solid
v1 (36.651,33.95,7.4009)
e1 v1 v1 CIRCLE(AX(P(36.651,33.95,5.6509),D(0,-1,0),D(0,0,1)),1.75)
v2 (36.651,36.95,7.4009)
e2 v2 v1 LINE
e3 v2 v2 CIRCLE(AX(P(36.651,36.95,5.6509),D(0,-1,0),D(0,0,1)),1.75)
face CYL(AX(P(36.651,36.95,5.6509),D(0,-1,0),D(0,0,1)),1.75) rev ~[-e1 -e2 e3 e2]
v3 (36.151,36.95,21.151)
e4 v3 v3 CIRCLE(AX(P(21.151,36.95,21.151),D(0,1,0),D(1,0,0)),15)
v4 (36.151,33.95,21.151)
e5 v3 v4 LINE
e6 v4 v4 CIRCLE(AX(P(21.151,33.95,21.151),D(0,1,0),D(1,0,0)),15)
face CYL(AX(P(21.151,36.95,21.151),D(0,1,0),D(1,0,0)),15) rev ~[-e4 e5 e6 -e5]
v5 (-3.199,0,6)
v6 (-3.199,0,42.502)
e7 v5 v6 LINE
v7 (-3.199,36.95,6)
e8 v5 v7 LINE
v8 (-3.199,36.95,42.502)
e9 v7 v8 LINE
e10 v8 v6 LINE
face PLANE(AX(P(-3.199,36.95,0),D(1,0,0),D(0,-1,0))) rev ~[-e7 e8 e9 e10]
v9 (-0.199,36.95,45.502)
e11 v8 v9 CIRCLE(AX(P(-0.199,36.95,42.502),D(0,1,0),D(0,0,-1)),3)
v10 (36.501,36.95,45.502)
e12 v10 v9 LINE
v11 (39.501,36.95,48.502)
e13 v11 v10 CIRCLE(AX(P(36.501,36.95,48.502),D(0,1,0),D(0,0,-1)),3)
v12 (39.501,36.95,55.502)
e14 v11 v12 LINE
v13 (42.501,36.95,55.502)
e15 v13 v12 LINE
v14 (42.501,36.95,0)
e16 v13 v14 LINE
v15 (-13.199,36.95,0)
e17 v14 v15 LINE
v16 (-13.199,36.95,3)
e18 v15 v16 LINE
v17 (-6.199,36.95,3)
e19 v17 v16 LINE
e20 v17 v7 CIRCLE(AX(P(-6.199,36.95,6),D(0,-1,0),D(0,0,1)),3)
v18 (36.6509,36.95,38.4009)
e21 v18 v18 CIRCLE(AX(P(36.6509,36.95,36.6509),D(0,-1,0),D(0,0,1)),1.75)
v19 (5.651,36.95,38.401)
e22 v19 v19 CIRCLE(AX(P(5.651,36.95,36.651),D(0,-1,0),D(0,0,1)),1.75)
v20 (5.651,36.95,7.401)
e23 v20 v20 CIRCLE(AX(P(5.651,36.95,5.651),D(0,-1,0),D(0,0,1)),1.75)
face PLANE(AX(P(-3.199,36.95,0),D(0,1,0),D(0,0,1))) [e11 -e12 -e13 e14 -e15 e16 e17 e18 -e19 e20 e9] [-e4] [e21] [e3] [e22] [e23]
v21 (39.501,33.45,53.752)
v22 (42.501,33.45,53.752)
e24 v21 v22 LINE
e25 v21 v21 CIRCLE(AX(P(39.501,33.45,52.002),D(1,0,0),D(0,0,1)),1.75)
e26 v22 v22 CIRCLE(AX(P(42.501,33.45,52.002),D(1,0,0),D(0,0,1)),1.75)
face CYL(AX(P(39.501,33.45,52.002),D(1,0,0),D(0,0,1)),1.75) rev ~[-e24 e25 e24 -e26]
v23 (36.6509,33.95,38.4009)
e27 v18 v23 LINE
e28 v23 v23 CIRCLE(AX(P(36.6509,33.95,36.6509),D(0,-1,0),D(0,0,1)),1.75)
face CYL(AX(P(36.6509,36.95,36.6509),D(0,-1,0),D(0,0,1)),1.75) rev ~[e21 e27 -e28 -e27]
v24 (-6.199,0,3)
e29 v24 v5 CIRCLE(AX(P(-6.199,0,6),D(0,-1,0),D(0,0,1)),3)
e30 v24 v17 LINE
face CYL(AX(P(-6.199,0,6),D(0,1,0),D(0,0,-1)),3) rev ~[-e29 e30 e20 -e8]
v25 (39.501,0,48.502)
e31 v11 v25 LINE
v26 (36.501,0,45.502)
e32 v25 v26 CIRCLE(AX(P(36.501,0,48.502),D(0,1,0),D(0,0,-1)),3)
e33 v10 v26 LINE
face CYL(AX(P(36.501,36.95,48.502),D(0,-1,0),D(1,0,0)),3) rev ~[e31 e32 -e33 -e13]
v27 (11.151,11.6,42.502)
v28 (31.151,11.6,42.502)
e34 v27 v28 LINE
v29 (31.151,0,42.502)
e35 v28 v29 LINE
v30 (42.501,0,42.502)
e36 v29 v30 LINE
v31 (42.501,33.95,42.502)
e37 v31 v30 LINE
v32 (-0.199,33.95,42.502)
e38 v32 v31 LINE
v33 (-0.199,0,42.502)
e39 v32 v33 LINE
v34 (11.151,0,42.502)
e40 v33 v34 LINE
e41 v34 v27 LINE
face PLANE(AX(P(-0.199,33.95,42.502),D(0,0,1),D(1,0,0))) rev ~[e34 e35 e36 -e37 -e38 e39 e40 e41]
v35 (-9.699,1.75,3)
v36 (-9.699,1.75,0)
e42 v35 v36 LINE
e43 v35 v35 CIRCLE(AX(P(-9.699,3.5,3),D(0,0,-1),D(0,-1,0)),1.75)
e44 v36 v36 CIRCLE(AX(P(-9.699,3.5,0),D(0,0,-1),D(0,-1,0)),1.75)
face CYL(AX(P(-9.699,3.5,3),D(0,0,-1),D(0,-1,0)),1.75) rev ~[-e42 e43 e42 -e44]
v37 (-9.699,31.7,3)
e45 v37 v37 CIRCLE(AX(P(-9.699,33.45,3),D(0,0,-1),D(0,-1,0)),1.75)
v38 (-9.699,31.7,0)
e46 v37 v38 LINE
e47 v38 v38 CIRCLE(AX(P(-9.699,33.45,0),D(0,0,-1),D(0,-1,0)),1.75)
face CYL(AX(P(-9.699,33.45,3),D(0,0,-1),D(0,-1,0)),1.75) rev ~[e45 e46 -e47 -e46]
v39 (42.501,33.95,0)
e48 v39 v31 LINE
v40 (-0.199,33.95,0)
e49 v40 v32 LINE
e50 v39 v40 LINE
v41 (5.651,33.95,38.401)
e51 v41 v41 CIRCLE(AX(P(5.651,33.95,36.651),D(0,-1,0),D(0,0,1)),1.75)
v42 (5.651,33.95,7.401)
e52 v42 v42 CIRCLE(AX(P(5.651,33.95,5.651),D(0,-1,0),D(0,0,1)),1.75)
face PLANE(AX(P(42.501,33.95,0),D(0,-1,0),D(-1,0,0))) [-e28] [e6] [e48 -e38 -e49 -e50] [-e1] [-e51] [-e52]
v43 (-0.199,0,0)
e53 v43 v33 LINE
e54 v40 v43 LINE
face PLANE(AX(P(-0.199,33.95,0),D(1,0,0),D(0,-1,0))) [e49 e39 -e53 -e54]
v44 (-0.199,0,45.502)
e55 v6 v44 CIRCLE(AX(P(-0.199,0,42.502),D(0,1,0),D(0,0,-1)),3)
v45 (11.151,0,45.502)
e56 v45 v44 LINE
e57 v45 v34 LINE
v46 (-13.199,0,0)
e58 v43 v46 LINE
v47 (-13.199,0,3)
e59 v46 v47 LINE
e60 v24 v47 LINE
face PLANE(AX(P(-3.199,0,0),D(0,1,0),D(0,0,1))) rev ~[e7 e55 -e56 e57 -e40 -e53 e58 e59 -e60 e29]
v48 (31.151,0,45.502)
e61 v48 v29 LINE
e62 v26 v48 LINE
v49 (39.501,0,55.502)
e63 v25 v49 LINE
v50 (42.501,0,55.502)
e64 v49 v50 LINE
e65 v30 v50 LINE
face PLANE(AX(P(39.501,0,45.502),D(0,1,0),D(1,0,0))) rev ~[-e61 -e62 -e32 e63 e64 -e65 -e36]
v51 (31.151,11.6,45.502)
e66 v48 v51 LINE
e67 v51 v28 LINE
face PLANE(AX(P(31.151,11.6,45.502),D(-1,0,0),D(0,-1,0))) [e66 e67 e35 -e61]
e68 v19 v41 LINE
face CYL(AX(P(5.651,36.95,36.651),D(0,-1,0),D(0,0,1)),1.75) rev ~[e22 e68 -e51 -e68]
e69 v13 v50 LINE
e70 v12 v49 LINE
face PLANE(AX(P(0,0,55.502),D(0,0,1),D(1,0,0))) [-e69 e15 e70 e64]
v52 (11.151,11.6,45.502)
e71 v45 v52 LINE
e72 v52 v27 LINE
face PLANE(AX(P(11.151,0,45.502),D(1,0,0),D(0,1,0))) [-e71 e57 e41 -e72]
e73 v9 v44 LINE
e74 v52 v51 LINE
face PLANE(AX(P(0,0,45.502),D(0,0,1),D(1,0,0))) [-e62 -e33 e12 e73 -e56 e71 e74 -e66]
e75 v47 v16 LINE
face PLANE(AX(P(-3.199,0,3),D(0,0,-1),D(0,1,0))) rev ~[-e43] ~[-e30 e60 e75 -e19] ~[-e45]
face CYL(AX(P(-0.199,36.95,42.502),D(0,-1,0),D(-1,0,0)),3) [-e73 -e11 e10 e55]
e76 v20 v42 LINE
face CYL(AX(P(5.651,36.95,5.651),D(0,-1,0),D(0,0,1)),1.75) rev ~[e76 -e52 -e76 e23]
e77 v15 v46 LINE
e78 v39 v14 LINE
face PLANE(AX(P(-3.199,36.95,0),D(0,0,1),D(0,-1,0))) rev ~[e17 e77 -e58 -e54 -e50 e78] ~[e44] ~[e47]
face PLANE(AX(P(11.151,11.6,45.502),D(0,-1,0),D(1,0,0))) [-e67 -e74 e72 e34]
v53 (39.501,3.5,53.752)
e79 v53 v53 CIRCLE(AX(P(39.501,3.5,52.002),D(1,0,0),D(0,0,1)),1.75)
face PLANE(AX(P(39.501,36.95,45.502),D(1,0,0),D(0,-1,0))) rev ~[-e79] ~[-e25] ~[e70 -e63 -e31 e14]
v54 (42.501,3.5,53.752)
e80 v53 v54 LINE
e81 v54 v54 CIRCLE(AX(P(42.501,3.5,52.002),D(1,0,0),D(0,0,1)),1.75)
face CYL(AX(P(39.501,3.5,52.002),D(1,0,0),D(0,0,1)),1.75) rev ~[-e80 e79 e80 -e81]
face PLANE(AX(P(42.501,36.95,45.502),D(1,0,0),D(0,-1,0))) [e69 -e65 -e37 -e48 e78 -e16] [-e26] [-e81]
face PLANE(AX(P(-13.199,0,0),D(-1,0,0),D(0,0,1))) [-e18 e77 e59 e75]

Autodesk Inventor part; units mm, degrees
ref_plane "YZ Plane" through (0, 0, 0) normal (1, 0, 0) x (0, 1, 0)
ref_plane "XZ Plane" through (0, 0, 0) normal (0, 1, 0) x (-1, 0, 0)
ref_plane "XY Plane" through (0, 0, 0) normal (0, 0, 1) x (1, 0, 0)
sketch "Boceto1" plane through (0, 0, 0) normal (0, 0, 1) x (1, 0, 0)
  line L0 (42.301, 0) -> (42.301, 9.6) projected
  line L1 (42.302, 9.6) -> (42.302, 26.1) projected
  line L2 (42.301, 26.1) -> (42.301, 33.75) projected
  line L3 (38.301, 0) -> (42.301, 0) projected
  line L4 (4.001, 33.75) -> (38.301, 33.75) projected
  line L5 (38.301, 33.75) -> (42.301, 33.75) projected
  line L6 (0.001, 33.75) -> (4.001, 33.75) projected
  line L7 (0.001, 26.1) -> (0.001, 33.75) projected
  line L8 (0.001, 9.6) -> (0.001, 26.1) projected
  line L9 (0.001, 0) -> (0.001, 9.6) projected
  line L10 (42.301, 33.75) -> (0.001, 33.75)
  line L11 (0.001, 33.75) -> (0.001, 0)
  line L12 (0.001, 0) -> (42.301, 0)
  line L13 (42.301, 0) -> (42.301, 33.75)
  line L14 (42.501, 33.95) -> (-0.199, 33.95)
  line L15 (-0.199, 33.95) -> (-0.199, -0.2)
  line L16 (-0.199, -0.2) -> (42.501, -0.2)
  line L17 (42.501, -0.2) -> (42.501, 33.95)
  line L18 (42.501, 36.95) -> (-3.199, 36.95)
  line L19 (-3.199, 36.95) -> (-3.199, 0)
  line L20 (-3.199, -3.2) -> (45.501, -3.2)
  line L21 (45.501, 0) -> (45.501, 36.95)
  line L22 (42.301, 0) -> (45.501, 0)
  line L23 (0.001, 0) -> (-3.199, 0)
  line L24 (42.501, 33.95) -> (42.501, 36.95)
  point P0 (0, 0)
  point P1 (-0.199, 0)
  dimension "d0" = 0.2
  dimension "d1" = 3
extrude "Extrusión1" add sketch "Boceto1" along normal blind 45.502 contours L14 L15 L23 L19 L18 L24
sketch "Boceto2" plane through (-0.199, 33.95, 0) normal (0, -1, 0) x (1, 0, 0)
  line L0 (0, 0) -> (42.7, 0) projected
  line L1 (42.7, 0) -> (42.7, 45.502) projected
  line L2 (0, 45.502) -> (42.7, 45.502) projected
  line L3 (0, 0) -> (0, 45.502) projected
  line L4 (42.7, 45.502) -> (0, 45.502)
  line L5 (0, 45.502) -> (0, 42.502)
  line L6 (0, 42.502) -> (42.7, 42.502)
  line L7 (42.7, 42.502) -> (42.7, 45.502)
  point P0 (0.199, 0)
  dimension "d4" = 3
extrude "Extrusión2" add sketch "Boceto2" along normal up to surface (33.95 mm away) contours L3 L2 L1 L6
sketch "Boceto3" plane through (0, 0, 45.502) normal (0, 0, 1) x (1, 0, 0)
  line L0 (-3.199, 0) -> (42.501, 0) projected
  line L1 (42.501, 36.95) -> (42.501, 0) projected
  line L2 (42.501, 36.95) -> (-3.199, 36.95) projected
  line L3 (-3.199, 36.95) -> (-3.199, 0) projected
  line L4 (-6.5037, 43.25) -> (-6.5037, 58.25) projected
  line L5 (-6.5037, 43.25) -> (-6.5037, 58.25) projected
  line L6 (29.151, 9.6) -> (29.151, 3.2) projected
  line L7 (29.151, 0) -> (29.151, 3.2) projected
  line L8 (13.651, 3.6) -> (13.651, 9.1) projected
  line L9 (13.151, 3.2) -> (13.151, 0) projected
  line L10 (13.151, 9.6) -> (13.151, 3.2) projected
  line L11 (29.151, 9.6) -> (13.151, 9.6) projected
  line L12 (11.151, 0) -> (11.151, 3.2)
  line L13 (11.151, 3.2) -> (11.151, 11.6)
  line L14 (11.151, 11.6) -> (31.151, 11.6)
  line L15 (31.151, 11.6) -> (31.151, 3.2)
  line L16 (31.151, 3.2) -> (31.151, 0)
  point P0 (0, 0)
  point P1 (-15.9908, 43.25)
  dimension "d7" = 2
extrude "Extrusión3" cut sketch "Boceto3" against normal blind 10 contours L12 L13 L14 L15 L16 L0 L7 L6 L11 L10 L9 | L9 L10 L11 L6 L7 L0
sketch "Boceto4" plane through (-3.199, 36.95, 0) normal (0, 1, 0) x (1, 0, 0)
  circle A0 centre (24.35, -21.151) radius 2.5 projected
  circle A1 centre (24.35, -21.151) radius 15
  point P0 (3.199, 0)
  dimension "d10" = 30
extrude "Extrusión4" cut sketch "Boceto4" against normal blind 10 contours A0 | A1
sketch "Boceto5" plane through (-3.199, 36.95, 0) normal (0, 1, 0) x (1, 0, 0)
  circle A0 centre (24.35, -21.151) radius 15 projected
  line L0 (45.7, 0) -> (0, 0) projected
  line L1 (0, 0) -> (0, -45.502) projected
  line L2 (45.7, -45.502) -> (0, -45.502) projected
  line L3 (45.7, 0) -> (45.7, -45.502) projected
  circle A1 centre (24.35, -21.151) radius 15 projected
  line L4 (45.7, -42.502) -> (3, -42.502) projected
  line L5 (3, 0) -> (3, -42.502) projected
  line L6 (3, 0) -> (45.7, 0) projected
  line L7 (45.7, 0) -> (45.7, -42.502) projected
  circle A2 centre (8.85, -36.651) radius 1.5 projected
  circle A3 centre (8.85, -5.651) radius 1.5 projected
  circle A4 centre (39.85, -5.6509) radius 1.5001 projected
  circle A5 centre (39.8499, -36.6509) radius 1.4998 projected
  circle A6 centre (39.8499, -36.6509) radius 2
  circle A7 centre (39.85, -5.6509) radius 2
  circle A8 centre (8.85, -5.651) radius 2
  circle A9 centre (8.85, -36.651) radius 2
  point P0 (3.199, 0)
  dimension "d13" = 4
  dimension "d14" = 4
  dimension "d15" = 4
  dimension "d16" = 4
hole "Agujero1" at (5.651, 36.95, 36.651) at (5.651, 36.95, 5.651) at (36.651, 36.95, 5.6509) at (36.6509, 36.95, 36.6509) direction (0, -1, 0) diameter 3.5 end through all
sketch "Boceto6" plane through (0, 0, 45.502) normal (0, 0, 1) x (1, 0, 0)
  line L0 (31.151, 11.6) -> (31.151, 0) projected
  line L1 (31.151, 0) -> (42.501, 0) projected
  line L2 (42.501, 36.95) -> (42.501, 0) projected
  line L3 (42.501, 36.95) -> (-3.199, 36.95) projected
  line L4 (-3.199, 36.95) -> (-3.199, 0) projected
  line L5 (-3.199, 0) -> (11.151, 0) projected
  line L6 (11.151, 0) -> (11.151, 11.6) projected
  line L7 (11.151, 11.6) -> (31.151, 11.6) projected
  line L8 (42.501, 36.95) -> (39.501, 36.95)
  line L9 (39.501, 36.95) -> (39.501, 0)
  line L10 (39.501, 0) -> (42.501, 0)
  line L11 (42.501, 0) -> (42.501, 36.95)
  point P0 (0, 0)
  dimension "d24" = 3
extrude "Extrusión5" add sketch "Boceto6" along normal blind 10 contours L9 L3 L2 L1
fillet "Empalme1" radius 3 1 edges at (39.501, 18.475, 45.502)
sketch "Boceto7" plane through (39.501, 0, 55.502) normal (-1, 0, 0) x (0, 0, 1)
  line L0 (-7, 0) -> (-7, 36.95) projected
  line L1 (-7, 0) -> (0, 0) projected
  line L2 (0, 36.95) -> (0, 0) projected
  line L3 (-7, 36.95) -> (0, 36.95) projected
  line L4 (-7, 36.95) -> (0, 36.95)
  line L5 (0, 36.95) -> (0, 29.95)
  line L6 (0, 29.95) -> (-7, 29.95)
  line L7 (-7, 29.95) -> (-7, 36.95)
  line L8 (-55.502, 36.95) -> (0, 36.95) projected
  line L9 (-7, 29.95) -> (0, 36.95)
  circle A0 centre (-3.5, 33.45) radius 2
  line L10 (-7, 0) -> (0, 0)
  line L11 (0, 0) -> (0, 7)
  line L12 (0, 7) -> (-7, 7)
  line L13 (-7, 7) -> (-7, 0)
  line L14 (-7, 0) -> (0, 7)
  circle A1 centre (-3.5, 3.5) radius 2
  point P0 (-55.502, 0)
  dimension "d28" = 7
  dimension "d29" = 4
  dimension "d30" = 7
  dimension "d31" = 7
  dimension "d32" = 4
hole "Agujero2" at (39.501, 33.45, 52.002) at (39.501, 3.5, 52.002) direction (1, 0, 0) diameter 3.5 end through all
sketch "Boceto8" plane through (-3.199, 0, 0) normal (-1, 0, 0) x (0, 0, 1)
  line L0 (0, 36.95) -> (0, 0) projected
  line L1 (0, 0) -> (45.502, 0) projected
  line L2 (45.502, 36.95) -> (45.502, 0) projected
  line L3 (0, 36.95) -> (45.502, 36.95) projected
  line L4 (0, 0) -> (3, 0)
  line L5 (3, 0) -> (3, 36.95)
  line L6 (3, 36.95) -> (0, 36.95)
  line L7 (0, 36.95) -> (0, 0)
  point P0 (0, 0)
  dimension "d40" = 3
extrude "Extrusión6" add sketch "Boceto8" along normal blind 10 contours L3 L5 L1 L0
fillet "Empalme2" radius 3 1 edges at (-3.199, 18.475, 3)
sketch "Boceto9" plane through (-13.199, 0, 3) normal (0, 0, 1) x (1, 0, 0)
  line L0 (7, 36.95) -> (7, 0) projected
  line L1 (7, 36.95) -> (0, 36.95) projected
  line L2 (0, 0) -> (0, 36.95) projected
  line L3 (7, 0) -> (0, 0) projected
  line L4 (0, 36.95) -> (7, 36.95)
  line L5 (7, 36.95) -> (7, 29.95)
  line L6 (7, 29.95) -> (0, 29.95)
  line L7 (0, 29.95) -> (0, 36.95)
  line L8 (0, 0) -> (7, 0)
  line L9 (7, 0) -> (7, 7)
  line L10 (7, 7) -> (0, 7)
  line L11 (0, 7) -> (0, 0)
  line L12 (0, 29.95) -> (7, 36.95)
  line L13 (0, 7) -> (7, 0)
  circle A0 centre (3.5, 33.45) radius 1.75
  circle A1 centre (3.5, 3.5) radius 1.75
  point P0 (13.199, 0)
  dimension "d44" = 7
  dimension "d45" = 7
  dimension "d46" = 7
  dimension "d47" = 3.5
  dimension "d48" = 3.5
hole "Agujero3" at (-9.699, 33.45, 3) at (-9.699, 3.5, 3) direction (0, 0, -1) diameter 3.5 end through all
fillet "Empalme3" radius 3 1 edges at (-3.199, 18.475, 45.502)
properties part number "Soporte Motor"
